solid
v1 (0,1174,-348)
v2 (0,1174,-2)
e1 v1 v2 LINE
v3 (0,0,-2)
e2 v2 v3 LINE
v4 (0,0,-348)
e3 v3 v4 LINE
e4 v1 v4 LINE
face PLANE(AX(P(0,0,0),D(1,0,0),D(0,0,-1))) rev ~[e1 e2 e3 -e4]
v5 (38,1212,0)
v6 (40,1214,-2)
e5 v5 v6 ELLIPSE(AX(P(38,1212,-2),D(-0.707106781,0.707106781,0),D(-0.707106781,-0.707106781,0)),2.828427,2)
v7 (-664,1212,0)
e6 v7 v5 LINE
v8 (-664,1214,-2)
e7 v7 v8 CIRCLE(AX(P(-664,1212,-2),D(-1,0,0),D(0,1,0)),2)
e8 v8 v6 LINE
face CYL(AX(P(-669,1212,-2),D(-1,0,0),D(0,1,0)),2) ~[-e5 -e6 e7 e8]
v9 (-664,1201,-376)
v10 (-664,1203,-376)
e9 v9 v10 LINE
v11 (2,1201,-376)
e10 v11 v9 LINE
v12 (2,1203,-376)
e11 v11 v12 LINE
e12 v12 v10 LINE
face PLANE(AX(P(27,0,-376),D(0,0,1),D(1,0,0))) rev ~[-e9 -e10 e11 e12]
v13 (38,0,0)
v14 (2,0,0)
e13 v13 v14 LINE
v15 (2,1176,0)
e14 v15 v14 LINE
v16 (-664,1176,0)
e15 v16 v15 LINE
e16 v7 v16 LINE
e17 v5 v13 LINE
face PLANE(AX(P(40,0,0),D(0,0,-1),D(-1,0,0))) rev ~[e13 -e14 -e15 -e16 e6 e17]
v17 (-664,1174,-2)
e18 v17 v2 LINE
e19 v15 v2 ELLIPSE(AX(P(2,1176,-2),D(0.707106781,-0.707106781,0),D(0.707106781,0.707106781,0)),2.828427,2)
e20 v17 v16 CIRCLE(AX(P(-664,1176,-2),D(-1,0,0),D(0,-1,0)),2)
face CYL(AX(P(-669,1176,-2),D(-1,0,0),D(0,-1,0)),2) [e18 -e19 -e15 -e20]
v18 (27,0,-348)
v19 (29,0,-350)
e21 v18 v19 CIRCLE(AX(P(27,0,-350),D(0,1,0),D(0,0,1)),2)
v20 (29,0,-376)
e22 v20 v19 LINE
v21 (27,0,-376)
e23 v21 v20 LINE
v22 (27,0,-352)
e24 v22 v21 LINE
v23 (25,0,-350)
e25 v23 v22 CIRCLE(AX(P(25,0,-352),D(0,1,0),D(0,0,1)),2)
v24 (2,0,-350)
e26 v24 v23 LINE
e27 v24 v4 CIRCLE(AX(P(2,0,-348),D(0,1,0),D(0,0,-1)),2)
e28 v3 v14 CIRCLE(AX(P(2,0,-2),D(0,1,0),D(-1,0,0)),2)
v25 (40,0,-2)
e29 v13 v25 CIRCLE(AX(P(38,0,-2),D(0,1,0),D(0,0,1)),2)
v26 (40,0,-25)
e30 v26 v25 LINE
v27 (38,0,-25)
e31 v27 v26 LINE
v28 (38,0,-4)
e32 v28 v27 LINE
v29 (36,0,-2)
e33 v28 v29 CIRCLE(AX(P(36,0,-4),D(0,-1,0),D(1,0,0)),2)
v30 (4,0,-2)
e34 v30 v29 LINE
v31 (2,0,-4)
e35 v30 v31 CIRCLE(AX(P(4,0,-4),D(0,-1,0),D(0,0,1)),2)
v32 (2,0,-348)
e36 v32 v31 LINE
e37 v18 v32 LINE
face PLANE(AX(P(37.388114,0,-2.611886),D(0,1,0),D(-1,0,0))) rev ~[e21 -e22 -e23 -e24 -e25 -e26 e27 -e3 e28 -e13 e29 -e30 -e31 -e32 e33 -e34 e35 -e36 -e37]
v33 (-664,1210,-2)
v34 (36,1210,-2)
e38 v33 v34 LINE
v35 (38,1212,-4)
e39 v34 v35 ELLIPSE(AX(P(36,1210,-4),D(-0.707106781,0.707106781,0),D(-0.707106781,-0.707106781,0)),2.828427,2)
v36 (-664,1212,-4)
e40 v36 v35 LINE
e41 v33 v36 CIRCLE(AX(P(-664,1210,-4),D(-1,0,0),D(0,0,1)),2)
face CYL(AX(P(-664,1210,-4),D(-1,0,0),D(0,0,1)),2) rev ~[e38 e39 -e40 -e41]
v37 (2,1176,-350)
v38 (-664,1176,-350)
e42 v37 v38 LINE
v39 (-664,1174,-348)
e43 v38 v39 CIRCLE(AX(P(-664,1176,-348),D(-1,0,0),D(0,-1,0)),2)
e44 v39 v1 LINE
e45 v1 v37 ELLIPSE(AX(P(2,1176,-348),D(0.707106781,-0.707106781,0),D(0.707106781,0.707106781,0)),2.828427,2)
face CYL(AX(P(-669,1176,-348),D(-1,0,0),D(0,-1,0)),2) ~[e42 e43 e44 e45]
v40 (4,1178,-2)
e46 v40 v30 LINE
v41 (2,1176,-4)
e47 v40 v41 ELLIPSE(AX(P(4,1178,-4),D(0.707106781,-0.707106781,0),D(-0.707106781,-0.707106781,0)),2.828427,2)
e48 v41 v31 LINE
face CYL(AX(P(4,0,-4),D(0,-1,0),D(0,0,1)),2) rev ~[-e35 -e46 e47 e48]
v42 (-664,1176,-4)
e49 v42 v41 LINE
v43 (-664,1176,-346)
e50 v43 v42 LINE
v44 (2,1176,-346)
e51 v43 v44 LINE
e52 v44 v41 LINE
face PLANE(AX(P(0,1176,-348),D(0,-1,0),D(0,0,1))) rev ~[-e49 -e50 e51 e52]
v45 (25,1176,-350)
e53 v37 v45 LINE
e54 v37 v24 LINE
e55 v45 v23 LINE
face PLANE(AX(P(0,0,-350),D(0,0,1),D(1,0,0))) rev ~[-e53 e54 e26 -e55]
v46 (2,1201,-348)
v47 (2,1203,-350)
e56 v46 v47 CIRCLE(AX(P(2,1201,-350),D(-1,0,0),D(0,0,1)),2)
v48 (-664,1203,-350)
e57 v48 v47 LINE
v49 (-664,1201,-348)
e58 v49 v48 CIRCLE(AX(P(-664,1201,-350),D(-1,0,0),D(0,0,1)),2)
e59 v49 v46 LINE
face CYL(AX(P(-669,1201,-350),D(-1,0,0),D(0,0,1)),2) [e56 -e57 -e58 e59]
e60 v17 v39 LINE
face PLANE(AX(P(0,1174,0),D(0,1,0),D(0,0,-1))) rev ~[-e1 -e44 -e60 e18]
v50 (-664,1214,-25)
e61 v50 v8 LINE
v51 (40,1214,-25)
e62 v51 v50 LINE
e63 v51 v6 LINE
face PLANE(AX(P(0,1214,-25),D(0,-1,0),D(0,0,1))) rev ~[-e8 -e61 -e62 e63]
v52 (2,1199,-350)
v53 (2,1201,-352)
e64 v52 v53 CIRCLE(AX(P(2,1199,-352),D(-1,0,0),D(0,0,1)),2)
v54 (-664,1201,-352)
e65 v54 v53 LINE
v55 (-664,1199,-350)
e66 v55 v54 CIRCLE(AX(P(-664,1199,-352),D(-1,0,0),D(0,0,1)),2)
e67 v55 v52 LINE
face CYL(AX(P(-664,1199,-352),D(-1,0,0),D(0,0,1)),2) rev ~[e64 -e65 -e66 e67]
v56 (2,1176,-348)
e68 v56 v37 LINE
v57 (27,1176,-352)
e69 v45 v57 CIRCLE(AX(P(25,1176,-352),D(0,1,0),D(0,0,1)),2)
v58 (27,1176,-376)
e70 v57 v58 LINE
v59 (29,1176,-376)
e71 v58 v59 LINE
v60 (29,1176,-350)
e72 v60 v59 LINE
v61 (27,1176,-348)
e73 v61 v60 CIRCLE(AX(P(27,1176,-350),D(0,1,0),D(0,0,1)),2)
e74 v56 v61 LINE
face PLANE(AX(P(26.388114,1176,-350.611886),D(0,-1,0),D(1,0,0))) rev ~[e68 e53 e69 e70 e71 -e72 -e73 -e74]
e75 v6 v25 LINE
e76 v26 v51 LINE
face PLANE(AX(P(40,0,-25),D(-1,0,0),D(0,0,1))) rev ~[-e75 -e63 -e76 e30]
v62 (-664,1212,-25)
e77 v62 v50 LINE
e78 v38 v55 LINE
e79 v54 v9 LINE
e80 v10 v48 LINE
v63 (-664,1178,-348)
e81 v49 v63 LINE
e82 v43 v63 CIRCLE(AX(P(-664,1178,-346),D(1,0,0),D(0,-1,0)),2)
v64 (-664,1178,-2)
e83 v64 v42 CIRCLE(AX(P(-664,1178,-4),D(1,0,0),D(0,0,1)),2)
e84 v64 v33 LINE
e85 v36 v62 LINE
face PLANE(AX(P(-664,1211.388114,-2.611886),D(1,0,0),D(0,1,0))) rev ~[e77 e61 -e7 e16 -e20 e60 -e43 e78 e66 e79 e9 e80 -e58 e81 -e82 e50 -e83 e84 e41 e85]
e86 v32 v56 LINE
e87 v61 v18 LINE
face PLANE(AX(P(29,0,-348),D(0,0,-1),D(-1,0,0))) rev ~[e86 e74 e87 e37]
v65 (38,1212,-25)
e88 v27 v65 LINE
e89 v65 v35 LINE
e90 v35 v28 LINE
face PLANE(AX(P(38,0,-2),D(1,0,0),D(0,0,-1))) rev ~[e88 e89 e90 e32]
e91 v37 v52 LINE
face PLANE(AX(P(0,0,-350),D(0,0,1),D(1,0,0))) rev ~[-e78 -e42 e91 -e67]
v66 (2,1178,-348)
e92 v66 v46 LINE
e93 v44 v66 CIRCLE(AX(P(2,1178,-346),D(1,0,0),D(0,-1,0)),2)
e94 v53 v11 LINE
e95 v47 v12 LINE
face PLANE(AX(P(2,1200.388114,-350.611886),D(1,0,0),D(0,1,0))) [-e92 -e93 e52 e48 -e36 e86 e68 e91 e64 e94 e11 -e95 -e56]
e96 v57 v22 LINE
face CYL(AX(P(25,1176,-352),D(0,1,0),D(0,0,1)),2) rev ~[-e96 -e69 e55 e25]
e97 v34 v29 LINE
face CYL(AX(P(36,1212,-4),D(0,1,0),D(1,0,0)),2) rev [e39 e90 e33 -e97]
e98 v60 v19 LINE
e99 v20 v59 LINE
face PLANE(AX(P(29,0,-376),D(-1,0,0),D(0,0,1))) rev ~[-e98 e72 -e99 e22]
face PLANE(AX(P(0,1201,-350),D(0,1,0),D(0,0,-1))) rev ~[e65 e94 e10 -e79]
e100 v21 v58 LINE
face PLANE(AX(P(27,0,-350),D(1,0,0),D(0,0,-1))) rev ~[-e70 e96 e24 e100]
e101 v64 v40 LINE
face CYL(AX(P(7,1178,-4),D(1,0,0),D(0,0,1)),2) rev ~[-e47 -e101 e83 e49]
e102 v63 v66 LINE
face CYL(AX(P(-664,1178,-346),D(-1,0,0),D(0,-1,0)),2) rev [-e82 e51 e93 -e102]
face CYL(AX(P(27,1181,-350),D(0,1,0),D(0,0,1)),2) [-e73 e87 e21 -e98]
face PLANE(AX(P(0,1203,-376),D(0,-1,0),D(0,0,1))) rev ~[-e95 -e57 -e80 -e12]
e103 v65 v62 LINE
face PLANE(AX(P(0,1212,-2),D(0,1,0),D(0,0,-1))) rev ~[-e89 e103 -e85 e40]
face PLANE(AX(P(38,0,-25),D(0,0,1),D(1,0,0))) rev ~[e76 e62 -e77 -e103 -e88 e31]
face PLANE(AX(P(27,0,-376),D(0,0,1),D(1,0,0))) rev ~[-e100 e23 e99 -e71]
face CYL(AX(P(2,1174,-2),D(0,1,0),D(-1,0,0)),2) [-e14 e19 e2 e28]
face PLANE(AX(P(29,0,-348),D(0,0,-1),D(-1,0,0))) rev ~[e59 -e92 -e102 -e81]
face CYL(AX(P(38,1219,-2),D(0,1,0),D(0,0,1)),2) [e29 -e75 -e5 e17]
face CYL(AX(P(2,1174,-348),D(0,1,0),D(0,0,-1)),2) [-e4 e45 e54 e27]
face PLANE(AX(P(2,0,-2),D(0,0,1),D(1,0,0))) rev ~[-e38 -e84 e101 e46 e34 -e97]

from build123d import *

# Parameters (mm, degrees)
F3_W         = 27
F3_H         = 27
F4_DEPTH     = 30
F5_T1_DEPTH  = 666
F5_T3_DEPTH  = 702
F5_T5_DEPTH  = 1176
F5_T7_DEPTH  = 1212
F5_T13_DEPTH = 1181
F5_T17_DEPTH = 671
F5_T20_DEPTH = 669
F5_T22_DEPTH = 676
F5_T24_DEPTH = 714
F5_T26_DEPTH = 1224
F5_T28_DEPTH = 1179
F5_T30_DEPTH = 1186
F5_T36_DEPTH = 674
F5_T40_DEPTH = 1184
F5_T47_DEPTH = 674
F5_T51_DEPTH = 1184


# Not quite as in the source:
# - a fillet or chamfer that OpenCascade refuses, or shapes differently, is made with other operations: its cross-section is extruded or revolved along the edge and cut away or added


with BuildPart() as f2:
    # F2: sweep along a path in F1
    with BuildLine(Plane.XY) as f2_path:
        Line((0, 0), (0, 1174))
        Line((0, 1174), (-664, 1174))
    # F0 (on Front) → F2 (sweep)
    with BuildSketch(Plane.XZ):
        Polygon((38, -2), (38, -25), (40, -25), (40, 0), (0, 0), (0, -350), (27, -350), (27, -376), (29, -376), (29, -348), (2, -348), (2, -2), align=None)
    sweep(path=f2_path.line, transition=Transition.RIGHT)

    # F3 (on face) → F4 (cut)
    with BuildSketch(Plane.XY.offset(-348)):
        with Locations((15.5, 1189.5)):
            Rectangle(F3_W, F3_H)
    extrude(amount=-F4_DEPTH, mode=Mode.SUBTRACT)

    # F5: fillet of radius 2 on 15 edges, made by hand

    # F5_s2 → F5_t1 (join)
    with BuildSketch(Plane.YZ.offset(-664)):
        with BuildLine():
            ThreePointArc((1199, -350), (1200.4142135624, -350.5857864376), (1201, -352))
            Line((1201, -352), (1201, -350))
            Line((1201, -350), (1199, -350))
        make_face()
        with BuildLine():
            ThreePointArc((1176, -346), (1176.5857864376, -347.4142135624), (1178, -348))
            Line((1178, -348), (1176, -348))
            Line((1176, -348), (1176, -346))
        make_face()
        with BuildLine():
            ThreePointArc((1178, -2), (1176.5857864376, -2.5857864376), (1176, -4))
            Line((1176, -4), (1176, -2))
            Line((1176, -2), (1178, -2))
        make_face()
    extrude(amount=F5_T1_DEPTH)

    # F5_s4 → F5_t3 (join)
    with BuildSketch(Plane.YZ.offset(-664)):
        with BuildLine():
            ThreePointArc((1210, -2), (1211.4142135624, -2.5857864376), (1212, -4))
            Line((1212, -4), (1212, -2))
            Line((1212, -2), (1210, -2))
        make_face()
    extrude(amount=F5_T3_DEPTH)

    # F5_s6 → F5_t5 (join)
    with BuildSketch(Plane.XZ.offset(-1176)):
        with BuildLine():
            ThreePointArc((25, -350), (26.4142135624, -350.5857864376), (27, -352))
            Line((27, -352), (27, -350))
            Line((27, -350), (25, -350))
        make_face()
        with BuildLine():
            ThreePointArc((4, -2), (2.5857864376, -2.5857864376), (2, -4))
            Line((2, -4), (2, -2))
            Line((2, -2), (4, -2))
        make_face()
    extrude(amount=F5_T5_DEPTH)

    # F5_s8 → F5_t7 (join)
    with BuildSketch(Plane.XZ.offset(-1212)):
        with BuildLine():
            ThreePointArc((38, -4), (37.4142135624, -2.5857864376), (36, -2))
            Line((36, -2), (38, -2))
            Line((38, -2), (38, -4))
        make_face()
    extrude(amount=F5_T7_DEPTH)


with BuildPart() as f5_tool11:
    # F5_s12 → F5_t13 (new body)
    with BuildSketch(Plane.XZ):
        with BuildLine():
            ThreePointArc((4, -2), (2.5857864376, -2.5857864376), (2, -4))
            Line((2, -4), (2, -2))
            Line((2, -2), (4, -2))
        make_face()
    extrude(amount=-F5_T13_DEPTH)

    split(bisect_by=Plane.XZ.offset(-1176), keep=Keep.BOTTOM)


with BuildPart() as f5_tool15:
    # F5_s16 → F5_t17 (new body)
    with BuildSketch(Plane.YZ.offset(7)):
        with BuildLine():
            ThreePointArc((1178, -2), (1176.5857864376, -2.5857864376), (1176, -4))
            Line((1176, -4), (1176, -2))
            Line((1176, -2), (1178, -2))
        make_face()
    extrude(amount=-F5_T17_DEPTH)

    split(bisect_by=Plane.YZ.offset(2), keep=Keep.TOP)


with BuildPart() as f5_tool11_1:
    add(f5_tool11.part)

    # F5_t19: intersect F5_tool15
    add(f5_tool15.part, mode=Mode.INTERSECT)


with BuildPart() as f2_1:
    add(f2.part)

    # F5_t9: union F5_tool11
    add(f5_tool11_1.part)

    # F5_s21 → F5_t20 (cut)
    with BuildSketch(Plane.YZ.offset(-669)):
        with BuildLine():
            ThreePointArc((1174, -348), (1174.5857864376, -349.4142135624), (1176, -350))
            Line((1176, -350), (1174, -350))
            Line((1174, -350), (1174, -348))
        make_face()
        with BuildLine():
            ThreePointArc((1174, -2), (1174.5857864376, -0.5857864376), (1176, 0))
            Line((1176, 0), (1174, 0))
            Line((1174, 0), (1174, -2))
        make_face()
    extrude(amount=F5_T20_DEPTH, mode=Mode.SUBTRACT)

    # F5_s23 → F5_t22 (cut)
    with BuildSketch(Plane.YZ.offset(-669)):
        with BuildLine():
            ThreePointArc((1201, -348), (1202.4142135624, -348.5857864376), (1203, -350))
            Line((1203, -350), (1203, -348))
            Line((1203, -348), (1201, -348))
        make_face()
    extrude(amount=F5_T22_DEPTH, mode=Mode.SUBTRACT)

    # F5_s25 → F5_t24 (cut)
    with BuildSketch(Plane.YZ.offset(-669)):
        with BuildLine():
            ThreePointArc((1214, -2), (1213.4142135624, -0.5857864376), (1212, 0))
            Line((1212, 0), (1214, 0))
            Line((1214, 0), (1214, -2))
        make_face()
    extrude(amount=F5_T24_DEPTH, mode=Mode.SUBTRACT)

    # F5_s27 → F5_t26 (cut)
    with BuildSketch(Plane.XZ.offset(-1219)):
        with BuildLine():
            ThreePointArc((38, 0), (39.4142135624, -0.5857864376), (40, -2))
            Line((40, -2), (40, 0))
            Line((40, 0), (38, 0))
        make_face()
    extrude(amount=F5_T26_DEPTH, mode=Mode.SUBTRACT)

    # F5_s29 → F5_t28 (cut)
    with BuildSketch(Plane.XZ.offset(-1174)):
        with BuildLine():
            ThreePointArc((0, -2), (0.5857864376, -0.5857864376), (2, 0))
            Line((2, 0), (0, 0))
            Line((0, 0), (0, -2))
        make_face()
        with BuildLine():
            ThreePointArc((2, -350), (0.5857864376, -349.4142135624), (0, -348))
            Line((0, -348), (0, -350))
            Line((0, -350), (2, -350))
        make_face()
    extrude(amount=F5_T28_DEPTH, mode=Mode.SUBTRACT)

    # F5_s31 → F5_t30 (cut)
    with BuildSketch(Plane.XZ.offset(-1181)):
        with BuildLine():
            ThreePointArc((27, -348), (28.4142135624, -348.5857864376), (29, -350))
            Line((29, -350), (29, -348))
            Line((29, -348), (27, -348))
        make_face()
    extrude(amount=F5_T30_DEPTH, mode=Mode.SUBTRACT)


with BuildPart() as f5_tool34:
    # F5_s35 → F5_t36 (new body)
    with BuildSketch(Plane.YZ.offset(5)):
        with BuildLine():
            ThreePointArc((1174, -348), (1174.5857864376, -349.4142135624), (1176, -350))
            Line((1176, -350), (1174, -350))
            Line((1174, -350), (1174, -348))
        make_face()
    extrude(amount=-F5_T36_DEPTH)

    split(bisect_by=Plane.YZ, keep=Keep.TOP)


with BuildPart() as f5_tool38:
    # F5_s39 → F5_t40 (new body)
    with BuildSketch(Plane.XZ.offset(5)):
        with BuildLine():
            ThreePointArc((2, -350), (0.5857864376, -349.4142135624), (0, -348))
            Line((0, -348), (0, -350))
            Line((0, -350), (2, -350))
        make_face()
    extrude(amount=-F5_T40_DEPTH)

    split(bisect_by=Plane.XZ.offset(-1174), keep=Keep.BOTTOM)


with BuildPart() as f5_tool34_1:
    add(f5_tool34.part)

    # F5_t42: intersect F5_tool38
    add(f5_tool38.part, mode=Mode.INTERSECT)


with BuildPart() as f2_2:
    add(f2_1.part)

    # F5_t32: cut F5_tool34
    add(f5_tool34_1.part, mode=Mode.SUBTRACT)


with BuildPart() as f5_tool45:
    # F5_s46 → F5_t47 (new body)
    with BuildSketch(Plane.YZ.offset(5)):
        with BuildLine():
            ThreePointArc((1174, -2), (1174.5857864376, -0.5857864376), (1176, 0))
            Line((1176, 0), (1174, 0))
            Line((1174, 0), (1174, -2))
        make_face()
    extrude(amount=-F5_T47_DEPTH)

    split(bisect_by=Plane.YZ, keep=Keep.TOP)


with BuildPart() as f5_tool49:
    # F5_s50 → F5_t51 (new body)
    with BuildSketch(Plane.XZ.offset(5)):
        with BuildLine():
            ThreePointArc((0, -2), (0.5857864376, -0.5857864376), (2, 0))
            Line((2, 0), (0, 0))
            Line((0, 0), (0, -2))
        make_face()
    extrude(amount=-F5_T51_DEPTH)

    split(bisect_by=Plane.XZ.offset(-1174), keep=Keep.BOTTOM)


with BuildPart() as f5_tool45_1:
    add(f5_tool45.part)

    # F5_t53: intersect F5_tool49
    add(f5_tool49.part, mode=Mode.INTERSECT)


with BuildPart() as f2_3:
    add(f2_2.part)

    # F5_t43: cut F5_tool45
    add(f5_tool45_1.part, mode=Mode.SUBTRACT)


solid = f2_3.part
